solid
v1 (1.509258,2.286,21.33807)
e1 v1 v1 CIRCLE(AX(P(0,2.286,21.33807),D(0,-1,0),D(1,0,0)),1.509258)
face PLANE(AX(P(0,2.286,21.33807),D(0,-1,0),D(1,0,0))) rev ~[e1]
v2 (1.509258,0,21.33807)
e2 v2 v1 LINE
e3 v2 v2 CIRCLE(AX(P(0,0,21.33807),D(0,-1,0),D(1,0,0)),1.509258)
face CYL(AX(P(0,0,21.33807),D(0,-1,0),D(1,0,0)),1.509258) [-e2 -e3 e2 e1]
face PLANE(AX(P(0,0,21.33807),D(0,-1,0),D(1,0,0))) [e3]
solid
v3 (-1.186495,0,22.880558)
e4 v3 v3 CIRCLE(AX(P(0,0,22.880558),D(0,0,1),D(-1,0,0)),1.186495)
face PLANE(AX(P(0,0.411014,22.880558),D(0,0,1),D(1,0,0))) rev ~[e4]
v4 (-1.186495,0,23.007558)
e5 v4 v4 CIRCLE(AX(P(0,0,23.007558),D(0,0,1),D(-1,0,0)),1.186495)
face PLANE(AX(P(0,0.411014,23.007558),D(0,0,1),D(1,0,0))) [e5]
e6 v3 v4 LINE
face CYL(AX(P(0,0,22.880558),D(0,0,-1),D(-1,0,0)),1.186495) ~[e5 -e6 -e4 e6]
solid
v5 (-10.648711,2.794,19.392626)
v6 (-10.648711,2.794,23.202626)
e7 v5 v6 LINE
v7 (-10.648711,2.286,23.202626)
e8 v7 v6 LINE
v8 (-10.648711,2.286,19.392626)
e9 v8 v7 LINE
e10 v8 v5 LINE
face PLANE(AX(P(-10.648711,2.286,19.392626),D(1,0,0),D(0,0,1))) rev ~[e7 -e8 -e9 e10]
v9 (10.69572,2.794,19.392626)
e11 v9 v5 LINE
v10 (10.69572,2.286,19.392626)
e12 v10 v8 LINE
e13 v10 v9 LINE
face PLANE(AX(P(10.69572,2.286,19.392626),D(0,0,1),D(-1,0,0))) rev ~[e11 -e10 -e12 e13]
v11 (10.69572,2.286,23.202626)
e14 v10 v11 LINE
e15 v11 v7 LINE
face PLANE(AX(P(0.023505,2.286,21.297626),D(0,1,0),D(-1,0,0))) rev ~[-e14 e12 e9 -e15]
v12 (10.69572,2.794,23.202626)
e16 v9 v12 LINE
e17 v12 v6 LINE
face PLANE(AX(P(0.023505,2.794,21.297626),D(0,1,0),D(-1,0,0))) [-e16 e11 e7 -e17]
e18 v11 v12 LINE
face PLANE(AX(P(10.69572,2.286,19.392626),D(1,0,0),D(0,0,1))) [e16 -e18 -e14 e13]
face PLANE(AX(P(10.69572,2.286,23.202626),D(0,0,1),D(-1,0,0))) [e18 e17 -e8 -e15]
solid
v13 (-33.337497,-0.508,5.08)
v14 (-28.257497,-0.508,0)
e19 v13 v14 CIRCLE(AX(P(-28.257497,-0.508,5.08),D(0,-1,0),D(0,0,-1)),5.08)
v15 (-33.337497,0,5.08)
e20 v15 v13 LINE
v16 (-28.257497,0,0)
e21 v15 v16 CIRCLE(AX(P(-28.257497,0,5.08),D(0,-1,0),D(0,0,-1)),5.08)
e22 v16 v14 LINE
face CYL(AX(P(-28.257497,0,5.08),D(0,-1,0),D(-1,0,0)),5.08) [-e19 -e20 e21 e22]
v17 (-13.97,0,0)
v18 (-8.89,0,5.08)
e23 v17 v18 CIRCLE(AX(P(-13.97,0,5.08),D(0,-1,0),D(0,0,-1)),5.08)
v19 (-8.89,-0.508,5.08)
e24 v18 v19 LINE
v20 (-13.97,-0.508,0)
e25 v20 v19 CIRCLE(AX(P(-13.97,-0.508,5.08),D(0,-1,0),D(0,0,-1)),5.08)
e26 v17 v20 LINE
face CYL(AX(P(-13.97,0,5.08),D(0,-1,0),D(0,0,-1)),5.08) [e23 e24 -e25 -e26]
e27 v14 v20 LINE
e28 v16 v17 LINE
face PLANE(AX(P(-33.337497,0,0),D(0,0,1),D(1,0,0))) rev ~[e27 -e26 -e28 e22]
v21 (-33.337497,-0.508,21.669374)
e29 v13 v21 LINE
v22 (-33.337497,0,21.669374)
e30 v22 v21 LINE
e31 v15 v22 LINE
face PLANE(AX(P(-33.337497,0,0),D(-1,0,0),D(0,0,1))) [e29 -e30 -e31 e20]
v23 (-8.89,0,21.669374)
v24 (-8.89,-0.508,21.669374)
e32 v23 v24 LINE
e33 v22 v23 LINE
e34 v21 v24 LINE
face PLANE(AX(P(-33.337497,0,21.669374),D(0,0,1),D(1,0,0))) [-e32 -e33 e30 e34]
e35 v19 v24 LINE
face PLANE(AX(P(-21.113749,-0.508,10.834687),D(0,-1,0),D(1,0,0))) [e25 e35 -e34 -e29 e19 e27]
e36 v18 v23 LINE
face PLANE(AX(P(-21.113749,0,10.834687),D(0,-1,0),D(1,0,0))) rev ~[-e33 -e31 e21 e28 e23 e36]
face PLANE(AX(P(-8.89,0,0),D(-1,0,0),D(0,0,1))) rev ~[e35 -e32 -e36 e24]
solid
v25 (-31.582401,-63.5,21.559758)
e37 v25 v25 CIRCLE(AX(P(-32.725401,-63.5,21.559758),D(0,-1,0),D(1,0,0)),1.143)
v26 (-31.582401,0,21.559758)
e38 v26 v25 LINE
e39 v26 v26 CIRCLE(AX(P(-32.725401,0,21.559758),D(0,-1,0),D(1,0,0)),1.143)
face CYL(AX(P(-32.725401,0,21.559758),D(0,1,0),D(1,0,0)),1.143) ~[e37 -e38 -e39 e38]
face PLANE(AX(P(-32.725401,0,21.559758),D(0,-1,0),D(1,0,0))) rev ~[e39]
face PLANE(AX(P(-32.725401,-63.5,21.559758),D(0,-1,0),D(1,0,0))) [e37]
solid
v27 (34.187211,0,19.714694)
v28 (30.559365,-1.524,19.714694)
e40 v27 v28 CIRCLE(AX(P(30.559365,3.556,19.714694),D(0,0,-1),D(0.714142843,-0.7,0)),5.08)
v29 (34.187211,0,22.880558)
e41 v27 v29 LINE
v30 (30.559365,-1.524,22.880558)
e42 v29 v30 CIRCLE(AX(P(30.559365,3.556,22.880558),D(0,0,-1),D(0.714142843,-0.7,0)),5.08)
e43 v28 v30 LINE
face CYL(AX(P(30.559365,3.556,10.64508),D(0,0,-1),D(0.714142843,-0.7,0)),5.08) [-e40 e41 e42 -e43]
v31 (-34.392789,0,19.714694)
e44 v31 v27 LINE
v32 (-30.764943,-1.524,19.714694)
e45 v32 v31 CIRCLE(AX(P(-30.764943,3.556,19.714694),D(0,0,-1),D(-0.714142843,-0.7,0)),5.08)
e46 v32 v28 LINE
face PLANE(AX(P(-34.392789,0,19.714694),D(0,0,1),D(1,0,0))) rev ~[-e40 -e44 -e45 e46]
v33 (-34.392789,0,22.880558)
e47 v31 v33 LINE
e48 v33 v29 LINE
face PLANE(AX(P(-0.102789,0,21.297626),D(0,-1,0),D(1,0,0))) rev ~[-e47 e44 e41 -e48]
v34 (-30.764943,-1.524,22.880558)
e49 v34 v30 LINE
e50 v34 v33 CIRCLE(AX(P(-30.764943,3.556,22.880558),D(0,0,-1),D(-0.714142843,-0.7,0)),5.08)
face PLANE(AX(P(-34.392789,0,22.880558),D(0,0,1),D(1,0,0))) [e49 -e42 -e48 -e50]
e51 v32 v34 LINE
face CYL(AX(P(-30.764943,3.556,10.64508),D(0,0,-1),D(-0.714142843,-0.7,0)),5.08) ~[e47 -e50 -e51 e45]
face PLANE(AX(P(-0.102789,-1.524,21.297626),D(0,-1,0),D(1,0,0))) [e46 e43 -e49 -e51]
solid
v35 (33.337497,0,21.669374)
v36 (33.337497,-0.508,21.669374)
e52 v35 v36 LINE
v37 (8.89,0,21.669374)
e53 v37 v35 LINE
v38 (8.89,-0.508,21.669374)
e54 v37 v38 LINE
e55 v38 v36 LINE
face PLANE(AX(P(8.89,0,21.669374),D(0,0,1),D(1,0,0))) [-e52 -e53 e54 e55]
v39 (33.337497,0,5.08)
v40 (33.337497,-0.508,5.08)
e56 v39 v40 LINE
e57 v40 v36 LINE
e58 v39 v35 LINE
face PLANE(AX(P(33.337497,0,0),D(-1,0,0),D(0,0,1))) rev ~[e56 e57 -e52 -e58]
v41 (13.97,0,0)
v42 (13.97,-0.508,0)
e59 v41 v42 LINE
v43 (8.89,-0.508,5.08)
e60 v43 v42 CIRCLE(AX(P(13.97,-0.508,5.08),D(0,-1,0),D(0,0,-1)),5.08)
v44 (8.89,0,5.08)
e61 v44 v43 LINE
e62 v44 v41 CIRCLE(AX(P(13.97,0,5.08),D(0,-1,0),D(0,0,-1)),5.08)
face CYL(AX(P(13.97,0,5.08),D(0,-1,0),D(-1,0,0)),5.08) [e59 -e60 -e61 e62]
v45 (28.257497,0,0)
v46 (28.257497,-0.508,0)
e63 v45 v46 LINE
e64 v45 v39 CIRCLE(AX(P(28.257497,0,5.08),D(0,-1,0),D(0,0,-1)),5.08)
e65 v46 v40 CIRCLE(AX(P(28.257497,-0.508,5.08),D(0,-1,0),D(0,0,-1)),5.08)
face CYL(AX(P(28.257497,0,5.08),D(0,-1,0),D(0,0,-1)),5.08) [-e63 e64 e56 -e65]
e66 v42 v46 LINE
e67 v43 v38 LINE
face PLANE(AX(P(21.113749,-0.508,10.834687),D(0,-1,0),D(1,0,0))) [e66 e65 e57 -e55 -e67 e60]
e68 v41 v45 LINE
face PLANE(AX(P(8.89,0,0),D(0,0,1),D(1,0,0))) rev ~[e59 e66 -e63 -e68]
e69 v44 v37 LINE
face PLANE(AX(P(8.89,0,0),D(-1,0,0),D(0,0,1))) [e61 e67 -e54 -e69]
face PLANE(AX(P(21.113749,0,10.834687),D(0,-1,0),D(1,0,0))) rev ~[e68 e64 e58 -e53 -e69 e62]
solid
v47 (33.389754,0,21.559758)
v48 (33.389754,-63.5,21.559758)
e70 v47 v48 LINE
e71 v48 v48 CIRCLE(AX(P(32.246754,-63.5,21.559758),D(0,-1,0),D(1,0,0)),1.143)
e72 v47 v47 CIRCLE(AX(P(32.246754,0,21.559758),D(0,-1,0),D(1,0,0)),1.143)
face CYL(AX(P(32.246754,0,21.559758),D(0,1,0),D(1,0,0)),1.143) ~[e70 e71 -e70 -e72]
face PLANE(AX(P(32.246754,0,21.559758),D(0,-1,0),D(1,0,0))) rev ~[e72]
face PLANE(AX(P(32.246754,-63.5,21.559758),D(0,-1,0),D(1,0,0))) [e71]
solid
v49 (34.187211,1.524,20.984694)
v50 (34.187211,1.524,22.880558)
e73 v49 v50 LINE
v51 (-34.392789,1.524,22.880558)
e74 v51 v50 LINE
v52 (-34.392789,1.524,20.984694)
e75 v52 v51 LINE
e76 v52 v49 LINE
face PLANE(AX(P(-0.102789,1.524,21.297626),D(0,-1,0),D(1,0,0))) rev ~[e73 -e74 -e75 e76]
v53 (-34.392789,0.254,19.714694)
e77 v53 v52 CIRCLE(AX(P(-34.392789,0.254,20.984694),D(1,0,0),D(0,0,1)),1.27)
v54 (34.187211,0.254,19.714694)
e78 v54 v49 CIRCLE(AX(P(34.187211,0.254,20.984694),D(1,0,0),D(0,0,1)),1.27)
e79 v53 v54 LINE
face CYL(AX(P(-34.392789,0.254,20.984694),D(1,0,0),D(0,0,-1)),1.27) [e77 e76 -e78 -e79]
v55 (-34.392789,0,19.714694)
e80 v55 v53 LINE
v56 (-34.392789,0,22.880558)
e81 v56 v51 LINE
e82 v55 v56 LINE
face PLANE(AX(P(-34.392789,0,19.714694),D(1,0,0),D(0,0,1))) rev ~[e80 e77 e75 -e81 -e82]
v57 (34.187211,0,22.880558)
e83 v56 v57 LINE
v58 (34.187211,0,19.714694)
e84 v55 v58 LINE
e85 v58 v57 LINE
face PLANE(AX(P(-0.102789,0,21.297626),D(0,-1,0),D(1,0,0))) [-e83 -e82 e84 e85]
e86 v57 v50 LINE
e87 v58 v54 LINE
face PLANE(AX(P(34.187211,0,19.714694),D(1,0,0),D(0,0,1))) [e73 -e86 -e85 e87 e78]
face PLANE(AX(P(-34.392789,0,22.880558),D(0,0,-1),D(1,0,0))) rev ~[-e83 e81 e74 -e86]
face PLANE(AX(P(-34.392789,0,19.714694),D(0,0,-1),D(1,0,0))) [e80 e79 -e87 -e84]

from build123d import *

# Parameters (mm, degrees)
F0_W        = 24.4474970783
F0_H        = 21.6693738201
F1_DEPTH    = 0.508
F2_W        = 68.58
F2_H        = 3.1658634543
F3_DEPTH    = 1.524
F4_DEPTH    = 1.524
F5_R        = 5.08
F5_2_R      = 5.08
F6_R        = 1.143
F7_DEPTH    = 63.5
F8_R        = 1.27
F9_T1_DEPTH = 21.3050916628
F10_R       = 1.5092579777
F11_DEPTH   = 2.286
F12_W       = 21.3444312233
F12_H       = 3.81
F12_R       = 1.5092579777
F13_DEPTH   = 0.508
F15_DEPTH   = 0.127


# Not quite as in the source:
# - a fillet or chamfer that OpenCascade refuses, or shapes differently, is made with other operations: its cross-section is extruded or revolved along the edge and cut away or added


with BuildPart() as f1:
    # F0 (on Front) → F1 (new body)
    with BuildSketch(Plane.XZ):
        with Locations((-21.1137485391, 10.83468691)):
            Rectangle(F0_W, F0_H)
    extrude(amount=F1_DEPTH)

    # F5
    f5_edges = [f1.edges().sort_by_distance(p)[0] for p in [
        (-8.89, -0.254, 0),
        (-33.337497, -0.254, 0),
    ]]
    fillet(f5_edges, radius=F5_R)


with BuildPart() as f1b:
    # F0 (on Front) → F1, piece 2 (new body)
    with BuildSketch(Plane.XZ):
        with Locations((21.1137485391, 10.83468691)):
            Rectangle(F0_W, F0_H)
    extrude(amount=F1_DEPTH)

    # F5#2
    f5_2_edges = [f1b.edges().sort_by_distance(p)[0] for p in [
        (8.89, -0.254, 0),
        (33.337497, -0.254, 0),
    ]]
    fillet(f5_2_edges, radius=F5_2_R)


with BuildPart() as f3:
    # F2 (on Front) → F3 (new body)
    with BuildSketch(Plane.XZ):
        with Locations((-0.1027890062, 21.2976261973)):
            Rectangle(F2_W, F2_H)
    extrude(amount=F3_DEPTH)


with BuildPart() as f4:
    # F4 (new): a face of the model
    f4_faces = [f3.part.faces().sort_by_distance(p)[0] for p in [
        (-0.1027890062, 0, 21.2976261973),
    ]]
    extrude(f4_faces, amount=F4_DEPTH)

    # F8
    f8_edges = [f4.edges().sort_by_distance(p)[0] for p in [
        (-0.102789, 1.524, 19.714694),
    ]]
    fillet(f8_edges, radius=F8_R)


with BuildPart() as f7:
    # F6 (on Front) → F7 (new body)
    with BuildSketch(Plane.XZ):
        with Locations((32.2467535734, 21.5597579245)):
            Circle(F6_R)
    extrude(amount=F7_DEPTH)


with BuildPart() as f7b:
    # F6 (on Front) → F7, piece 2 (new body)
    with BuildSketch(Plane.XZ):
        with Locations((-32.7254012227, 21.5597579245)):
            Circle(F6_R)
    extrude(amount=F7_DEPTH)


with BuildPart() as f3_1:
    add(f3.part)

    # F9: fillet of radius 5.08 on 2 edges, made by hand

    # F9_s2 → F9_t1 (cut)
    with BuildSketch(Plane.XY.offset(10.6450803659)):
        with BuildLine():
            ThreePointArc((34.1872109938, 0), (32.5268408919, -1.1275285843), (30.5593653521, -1.524))
            Line((30.5593653521, -1.524), (34.1872109938, -1.524))
            Line((34.1872109938, -1.524), (34.1872109938, 0))
        make_face()
        with BuildLine():
            ThreePointArc((-34.3927890062, 0), (-32.7324189044, -1.1275285843), (-30.7649433645, -1.524))
            Line((-30.7649433645, -1.524), (-34.3927890062, -1.524))
            Line((-34.3927890062, -1.524), (-34.3927890062, 0))
        make_face()
    extrude(amount=F9_T1_DEPTH, mode=Mode.SUBTRACT)


with BuildPart() as f11:
    # F10 (on Front) → F11 (new body)
    with BuildSketch(Plane.XZ):
        with Locations((0, 21.3380698115)):
            Circle(F10_R)
    extrude(amount=-F11_DEPTH)


with BuildPart() as f13:
    # F12 (on face) → F13 (new body)
    with BuildSketch(Plane(origin=(0, 2.286, 0), x_dir=(-1, 0, 0), z_dir=(0, 1, 0))):
        with Locations((-0.0235047191, 21.2976261973)):
            Rectangle(F12_W, F12_H)
        with Locations((0, 21.3380698115)):
            Circle(F12_R, mode=Mode.SUBTRACT)
        with Locations((0, 21.3380698115)):
            Circle(F12_R)
    extrude(amount=F13_DEPTH)


with BuildPart() as f15:
    # F14 (on face) → F15 (new body)
    with BuildSketch(Plane.XY.offset(22.8805579245)):
        with BuildLine():
            Line((-1.1864949831, 0), (1.1864949831, 0))
            ThreePointArc((1.1864949831, 0), (0, 1.1864949831), (-1.1864949831, 0))
        make_face()
        with BuildLine():
            ThreePointArc((-1.1864949831, 0), (0, -1.1864949831), (1.1864949831, 0))
            Line((1.1864949831, 0), (-1.1864949831, 0))
        make_face()
    extrude(amount=F15_DEPTH)


solid = Compound([f1.part, f1b.part, f4.part, f7.part, f7b.part, f3_1.part, f11.part, f13.part, f15.part])
